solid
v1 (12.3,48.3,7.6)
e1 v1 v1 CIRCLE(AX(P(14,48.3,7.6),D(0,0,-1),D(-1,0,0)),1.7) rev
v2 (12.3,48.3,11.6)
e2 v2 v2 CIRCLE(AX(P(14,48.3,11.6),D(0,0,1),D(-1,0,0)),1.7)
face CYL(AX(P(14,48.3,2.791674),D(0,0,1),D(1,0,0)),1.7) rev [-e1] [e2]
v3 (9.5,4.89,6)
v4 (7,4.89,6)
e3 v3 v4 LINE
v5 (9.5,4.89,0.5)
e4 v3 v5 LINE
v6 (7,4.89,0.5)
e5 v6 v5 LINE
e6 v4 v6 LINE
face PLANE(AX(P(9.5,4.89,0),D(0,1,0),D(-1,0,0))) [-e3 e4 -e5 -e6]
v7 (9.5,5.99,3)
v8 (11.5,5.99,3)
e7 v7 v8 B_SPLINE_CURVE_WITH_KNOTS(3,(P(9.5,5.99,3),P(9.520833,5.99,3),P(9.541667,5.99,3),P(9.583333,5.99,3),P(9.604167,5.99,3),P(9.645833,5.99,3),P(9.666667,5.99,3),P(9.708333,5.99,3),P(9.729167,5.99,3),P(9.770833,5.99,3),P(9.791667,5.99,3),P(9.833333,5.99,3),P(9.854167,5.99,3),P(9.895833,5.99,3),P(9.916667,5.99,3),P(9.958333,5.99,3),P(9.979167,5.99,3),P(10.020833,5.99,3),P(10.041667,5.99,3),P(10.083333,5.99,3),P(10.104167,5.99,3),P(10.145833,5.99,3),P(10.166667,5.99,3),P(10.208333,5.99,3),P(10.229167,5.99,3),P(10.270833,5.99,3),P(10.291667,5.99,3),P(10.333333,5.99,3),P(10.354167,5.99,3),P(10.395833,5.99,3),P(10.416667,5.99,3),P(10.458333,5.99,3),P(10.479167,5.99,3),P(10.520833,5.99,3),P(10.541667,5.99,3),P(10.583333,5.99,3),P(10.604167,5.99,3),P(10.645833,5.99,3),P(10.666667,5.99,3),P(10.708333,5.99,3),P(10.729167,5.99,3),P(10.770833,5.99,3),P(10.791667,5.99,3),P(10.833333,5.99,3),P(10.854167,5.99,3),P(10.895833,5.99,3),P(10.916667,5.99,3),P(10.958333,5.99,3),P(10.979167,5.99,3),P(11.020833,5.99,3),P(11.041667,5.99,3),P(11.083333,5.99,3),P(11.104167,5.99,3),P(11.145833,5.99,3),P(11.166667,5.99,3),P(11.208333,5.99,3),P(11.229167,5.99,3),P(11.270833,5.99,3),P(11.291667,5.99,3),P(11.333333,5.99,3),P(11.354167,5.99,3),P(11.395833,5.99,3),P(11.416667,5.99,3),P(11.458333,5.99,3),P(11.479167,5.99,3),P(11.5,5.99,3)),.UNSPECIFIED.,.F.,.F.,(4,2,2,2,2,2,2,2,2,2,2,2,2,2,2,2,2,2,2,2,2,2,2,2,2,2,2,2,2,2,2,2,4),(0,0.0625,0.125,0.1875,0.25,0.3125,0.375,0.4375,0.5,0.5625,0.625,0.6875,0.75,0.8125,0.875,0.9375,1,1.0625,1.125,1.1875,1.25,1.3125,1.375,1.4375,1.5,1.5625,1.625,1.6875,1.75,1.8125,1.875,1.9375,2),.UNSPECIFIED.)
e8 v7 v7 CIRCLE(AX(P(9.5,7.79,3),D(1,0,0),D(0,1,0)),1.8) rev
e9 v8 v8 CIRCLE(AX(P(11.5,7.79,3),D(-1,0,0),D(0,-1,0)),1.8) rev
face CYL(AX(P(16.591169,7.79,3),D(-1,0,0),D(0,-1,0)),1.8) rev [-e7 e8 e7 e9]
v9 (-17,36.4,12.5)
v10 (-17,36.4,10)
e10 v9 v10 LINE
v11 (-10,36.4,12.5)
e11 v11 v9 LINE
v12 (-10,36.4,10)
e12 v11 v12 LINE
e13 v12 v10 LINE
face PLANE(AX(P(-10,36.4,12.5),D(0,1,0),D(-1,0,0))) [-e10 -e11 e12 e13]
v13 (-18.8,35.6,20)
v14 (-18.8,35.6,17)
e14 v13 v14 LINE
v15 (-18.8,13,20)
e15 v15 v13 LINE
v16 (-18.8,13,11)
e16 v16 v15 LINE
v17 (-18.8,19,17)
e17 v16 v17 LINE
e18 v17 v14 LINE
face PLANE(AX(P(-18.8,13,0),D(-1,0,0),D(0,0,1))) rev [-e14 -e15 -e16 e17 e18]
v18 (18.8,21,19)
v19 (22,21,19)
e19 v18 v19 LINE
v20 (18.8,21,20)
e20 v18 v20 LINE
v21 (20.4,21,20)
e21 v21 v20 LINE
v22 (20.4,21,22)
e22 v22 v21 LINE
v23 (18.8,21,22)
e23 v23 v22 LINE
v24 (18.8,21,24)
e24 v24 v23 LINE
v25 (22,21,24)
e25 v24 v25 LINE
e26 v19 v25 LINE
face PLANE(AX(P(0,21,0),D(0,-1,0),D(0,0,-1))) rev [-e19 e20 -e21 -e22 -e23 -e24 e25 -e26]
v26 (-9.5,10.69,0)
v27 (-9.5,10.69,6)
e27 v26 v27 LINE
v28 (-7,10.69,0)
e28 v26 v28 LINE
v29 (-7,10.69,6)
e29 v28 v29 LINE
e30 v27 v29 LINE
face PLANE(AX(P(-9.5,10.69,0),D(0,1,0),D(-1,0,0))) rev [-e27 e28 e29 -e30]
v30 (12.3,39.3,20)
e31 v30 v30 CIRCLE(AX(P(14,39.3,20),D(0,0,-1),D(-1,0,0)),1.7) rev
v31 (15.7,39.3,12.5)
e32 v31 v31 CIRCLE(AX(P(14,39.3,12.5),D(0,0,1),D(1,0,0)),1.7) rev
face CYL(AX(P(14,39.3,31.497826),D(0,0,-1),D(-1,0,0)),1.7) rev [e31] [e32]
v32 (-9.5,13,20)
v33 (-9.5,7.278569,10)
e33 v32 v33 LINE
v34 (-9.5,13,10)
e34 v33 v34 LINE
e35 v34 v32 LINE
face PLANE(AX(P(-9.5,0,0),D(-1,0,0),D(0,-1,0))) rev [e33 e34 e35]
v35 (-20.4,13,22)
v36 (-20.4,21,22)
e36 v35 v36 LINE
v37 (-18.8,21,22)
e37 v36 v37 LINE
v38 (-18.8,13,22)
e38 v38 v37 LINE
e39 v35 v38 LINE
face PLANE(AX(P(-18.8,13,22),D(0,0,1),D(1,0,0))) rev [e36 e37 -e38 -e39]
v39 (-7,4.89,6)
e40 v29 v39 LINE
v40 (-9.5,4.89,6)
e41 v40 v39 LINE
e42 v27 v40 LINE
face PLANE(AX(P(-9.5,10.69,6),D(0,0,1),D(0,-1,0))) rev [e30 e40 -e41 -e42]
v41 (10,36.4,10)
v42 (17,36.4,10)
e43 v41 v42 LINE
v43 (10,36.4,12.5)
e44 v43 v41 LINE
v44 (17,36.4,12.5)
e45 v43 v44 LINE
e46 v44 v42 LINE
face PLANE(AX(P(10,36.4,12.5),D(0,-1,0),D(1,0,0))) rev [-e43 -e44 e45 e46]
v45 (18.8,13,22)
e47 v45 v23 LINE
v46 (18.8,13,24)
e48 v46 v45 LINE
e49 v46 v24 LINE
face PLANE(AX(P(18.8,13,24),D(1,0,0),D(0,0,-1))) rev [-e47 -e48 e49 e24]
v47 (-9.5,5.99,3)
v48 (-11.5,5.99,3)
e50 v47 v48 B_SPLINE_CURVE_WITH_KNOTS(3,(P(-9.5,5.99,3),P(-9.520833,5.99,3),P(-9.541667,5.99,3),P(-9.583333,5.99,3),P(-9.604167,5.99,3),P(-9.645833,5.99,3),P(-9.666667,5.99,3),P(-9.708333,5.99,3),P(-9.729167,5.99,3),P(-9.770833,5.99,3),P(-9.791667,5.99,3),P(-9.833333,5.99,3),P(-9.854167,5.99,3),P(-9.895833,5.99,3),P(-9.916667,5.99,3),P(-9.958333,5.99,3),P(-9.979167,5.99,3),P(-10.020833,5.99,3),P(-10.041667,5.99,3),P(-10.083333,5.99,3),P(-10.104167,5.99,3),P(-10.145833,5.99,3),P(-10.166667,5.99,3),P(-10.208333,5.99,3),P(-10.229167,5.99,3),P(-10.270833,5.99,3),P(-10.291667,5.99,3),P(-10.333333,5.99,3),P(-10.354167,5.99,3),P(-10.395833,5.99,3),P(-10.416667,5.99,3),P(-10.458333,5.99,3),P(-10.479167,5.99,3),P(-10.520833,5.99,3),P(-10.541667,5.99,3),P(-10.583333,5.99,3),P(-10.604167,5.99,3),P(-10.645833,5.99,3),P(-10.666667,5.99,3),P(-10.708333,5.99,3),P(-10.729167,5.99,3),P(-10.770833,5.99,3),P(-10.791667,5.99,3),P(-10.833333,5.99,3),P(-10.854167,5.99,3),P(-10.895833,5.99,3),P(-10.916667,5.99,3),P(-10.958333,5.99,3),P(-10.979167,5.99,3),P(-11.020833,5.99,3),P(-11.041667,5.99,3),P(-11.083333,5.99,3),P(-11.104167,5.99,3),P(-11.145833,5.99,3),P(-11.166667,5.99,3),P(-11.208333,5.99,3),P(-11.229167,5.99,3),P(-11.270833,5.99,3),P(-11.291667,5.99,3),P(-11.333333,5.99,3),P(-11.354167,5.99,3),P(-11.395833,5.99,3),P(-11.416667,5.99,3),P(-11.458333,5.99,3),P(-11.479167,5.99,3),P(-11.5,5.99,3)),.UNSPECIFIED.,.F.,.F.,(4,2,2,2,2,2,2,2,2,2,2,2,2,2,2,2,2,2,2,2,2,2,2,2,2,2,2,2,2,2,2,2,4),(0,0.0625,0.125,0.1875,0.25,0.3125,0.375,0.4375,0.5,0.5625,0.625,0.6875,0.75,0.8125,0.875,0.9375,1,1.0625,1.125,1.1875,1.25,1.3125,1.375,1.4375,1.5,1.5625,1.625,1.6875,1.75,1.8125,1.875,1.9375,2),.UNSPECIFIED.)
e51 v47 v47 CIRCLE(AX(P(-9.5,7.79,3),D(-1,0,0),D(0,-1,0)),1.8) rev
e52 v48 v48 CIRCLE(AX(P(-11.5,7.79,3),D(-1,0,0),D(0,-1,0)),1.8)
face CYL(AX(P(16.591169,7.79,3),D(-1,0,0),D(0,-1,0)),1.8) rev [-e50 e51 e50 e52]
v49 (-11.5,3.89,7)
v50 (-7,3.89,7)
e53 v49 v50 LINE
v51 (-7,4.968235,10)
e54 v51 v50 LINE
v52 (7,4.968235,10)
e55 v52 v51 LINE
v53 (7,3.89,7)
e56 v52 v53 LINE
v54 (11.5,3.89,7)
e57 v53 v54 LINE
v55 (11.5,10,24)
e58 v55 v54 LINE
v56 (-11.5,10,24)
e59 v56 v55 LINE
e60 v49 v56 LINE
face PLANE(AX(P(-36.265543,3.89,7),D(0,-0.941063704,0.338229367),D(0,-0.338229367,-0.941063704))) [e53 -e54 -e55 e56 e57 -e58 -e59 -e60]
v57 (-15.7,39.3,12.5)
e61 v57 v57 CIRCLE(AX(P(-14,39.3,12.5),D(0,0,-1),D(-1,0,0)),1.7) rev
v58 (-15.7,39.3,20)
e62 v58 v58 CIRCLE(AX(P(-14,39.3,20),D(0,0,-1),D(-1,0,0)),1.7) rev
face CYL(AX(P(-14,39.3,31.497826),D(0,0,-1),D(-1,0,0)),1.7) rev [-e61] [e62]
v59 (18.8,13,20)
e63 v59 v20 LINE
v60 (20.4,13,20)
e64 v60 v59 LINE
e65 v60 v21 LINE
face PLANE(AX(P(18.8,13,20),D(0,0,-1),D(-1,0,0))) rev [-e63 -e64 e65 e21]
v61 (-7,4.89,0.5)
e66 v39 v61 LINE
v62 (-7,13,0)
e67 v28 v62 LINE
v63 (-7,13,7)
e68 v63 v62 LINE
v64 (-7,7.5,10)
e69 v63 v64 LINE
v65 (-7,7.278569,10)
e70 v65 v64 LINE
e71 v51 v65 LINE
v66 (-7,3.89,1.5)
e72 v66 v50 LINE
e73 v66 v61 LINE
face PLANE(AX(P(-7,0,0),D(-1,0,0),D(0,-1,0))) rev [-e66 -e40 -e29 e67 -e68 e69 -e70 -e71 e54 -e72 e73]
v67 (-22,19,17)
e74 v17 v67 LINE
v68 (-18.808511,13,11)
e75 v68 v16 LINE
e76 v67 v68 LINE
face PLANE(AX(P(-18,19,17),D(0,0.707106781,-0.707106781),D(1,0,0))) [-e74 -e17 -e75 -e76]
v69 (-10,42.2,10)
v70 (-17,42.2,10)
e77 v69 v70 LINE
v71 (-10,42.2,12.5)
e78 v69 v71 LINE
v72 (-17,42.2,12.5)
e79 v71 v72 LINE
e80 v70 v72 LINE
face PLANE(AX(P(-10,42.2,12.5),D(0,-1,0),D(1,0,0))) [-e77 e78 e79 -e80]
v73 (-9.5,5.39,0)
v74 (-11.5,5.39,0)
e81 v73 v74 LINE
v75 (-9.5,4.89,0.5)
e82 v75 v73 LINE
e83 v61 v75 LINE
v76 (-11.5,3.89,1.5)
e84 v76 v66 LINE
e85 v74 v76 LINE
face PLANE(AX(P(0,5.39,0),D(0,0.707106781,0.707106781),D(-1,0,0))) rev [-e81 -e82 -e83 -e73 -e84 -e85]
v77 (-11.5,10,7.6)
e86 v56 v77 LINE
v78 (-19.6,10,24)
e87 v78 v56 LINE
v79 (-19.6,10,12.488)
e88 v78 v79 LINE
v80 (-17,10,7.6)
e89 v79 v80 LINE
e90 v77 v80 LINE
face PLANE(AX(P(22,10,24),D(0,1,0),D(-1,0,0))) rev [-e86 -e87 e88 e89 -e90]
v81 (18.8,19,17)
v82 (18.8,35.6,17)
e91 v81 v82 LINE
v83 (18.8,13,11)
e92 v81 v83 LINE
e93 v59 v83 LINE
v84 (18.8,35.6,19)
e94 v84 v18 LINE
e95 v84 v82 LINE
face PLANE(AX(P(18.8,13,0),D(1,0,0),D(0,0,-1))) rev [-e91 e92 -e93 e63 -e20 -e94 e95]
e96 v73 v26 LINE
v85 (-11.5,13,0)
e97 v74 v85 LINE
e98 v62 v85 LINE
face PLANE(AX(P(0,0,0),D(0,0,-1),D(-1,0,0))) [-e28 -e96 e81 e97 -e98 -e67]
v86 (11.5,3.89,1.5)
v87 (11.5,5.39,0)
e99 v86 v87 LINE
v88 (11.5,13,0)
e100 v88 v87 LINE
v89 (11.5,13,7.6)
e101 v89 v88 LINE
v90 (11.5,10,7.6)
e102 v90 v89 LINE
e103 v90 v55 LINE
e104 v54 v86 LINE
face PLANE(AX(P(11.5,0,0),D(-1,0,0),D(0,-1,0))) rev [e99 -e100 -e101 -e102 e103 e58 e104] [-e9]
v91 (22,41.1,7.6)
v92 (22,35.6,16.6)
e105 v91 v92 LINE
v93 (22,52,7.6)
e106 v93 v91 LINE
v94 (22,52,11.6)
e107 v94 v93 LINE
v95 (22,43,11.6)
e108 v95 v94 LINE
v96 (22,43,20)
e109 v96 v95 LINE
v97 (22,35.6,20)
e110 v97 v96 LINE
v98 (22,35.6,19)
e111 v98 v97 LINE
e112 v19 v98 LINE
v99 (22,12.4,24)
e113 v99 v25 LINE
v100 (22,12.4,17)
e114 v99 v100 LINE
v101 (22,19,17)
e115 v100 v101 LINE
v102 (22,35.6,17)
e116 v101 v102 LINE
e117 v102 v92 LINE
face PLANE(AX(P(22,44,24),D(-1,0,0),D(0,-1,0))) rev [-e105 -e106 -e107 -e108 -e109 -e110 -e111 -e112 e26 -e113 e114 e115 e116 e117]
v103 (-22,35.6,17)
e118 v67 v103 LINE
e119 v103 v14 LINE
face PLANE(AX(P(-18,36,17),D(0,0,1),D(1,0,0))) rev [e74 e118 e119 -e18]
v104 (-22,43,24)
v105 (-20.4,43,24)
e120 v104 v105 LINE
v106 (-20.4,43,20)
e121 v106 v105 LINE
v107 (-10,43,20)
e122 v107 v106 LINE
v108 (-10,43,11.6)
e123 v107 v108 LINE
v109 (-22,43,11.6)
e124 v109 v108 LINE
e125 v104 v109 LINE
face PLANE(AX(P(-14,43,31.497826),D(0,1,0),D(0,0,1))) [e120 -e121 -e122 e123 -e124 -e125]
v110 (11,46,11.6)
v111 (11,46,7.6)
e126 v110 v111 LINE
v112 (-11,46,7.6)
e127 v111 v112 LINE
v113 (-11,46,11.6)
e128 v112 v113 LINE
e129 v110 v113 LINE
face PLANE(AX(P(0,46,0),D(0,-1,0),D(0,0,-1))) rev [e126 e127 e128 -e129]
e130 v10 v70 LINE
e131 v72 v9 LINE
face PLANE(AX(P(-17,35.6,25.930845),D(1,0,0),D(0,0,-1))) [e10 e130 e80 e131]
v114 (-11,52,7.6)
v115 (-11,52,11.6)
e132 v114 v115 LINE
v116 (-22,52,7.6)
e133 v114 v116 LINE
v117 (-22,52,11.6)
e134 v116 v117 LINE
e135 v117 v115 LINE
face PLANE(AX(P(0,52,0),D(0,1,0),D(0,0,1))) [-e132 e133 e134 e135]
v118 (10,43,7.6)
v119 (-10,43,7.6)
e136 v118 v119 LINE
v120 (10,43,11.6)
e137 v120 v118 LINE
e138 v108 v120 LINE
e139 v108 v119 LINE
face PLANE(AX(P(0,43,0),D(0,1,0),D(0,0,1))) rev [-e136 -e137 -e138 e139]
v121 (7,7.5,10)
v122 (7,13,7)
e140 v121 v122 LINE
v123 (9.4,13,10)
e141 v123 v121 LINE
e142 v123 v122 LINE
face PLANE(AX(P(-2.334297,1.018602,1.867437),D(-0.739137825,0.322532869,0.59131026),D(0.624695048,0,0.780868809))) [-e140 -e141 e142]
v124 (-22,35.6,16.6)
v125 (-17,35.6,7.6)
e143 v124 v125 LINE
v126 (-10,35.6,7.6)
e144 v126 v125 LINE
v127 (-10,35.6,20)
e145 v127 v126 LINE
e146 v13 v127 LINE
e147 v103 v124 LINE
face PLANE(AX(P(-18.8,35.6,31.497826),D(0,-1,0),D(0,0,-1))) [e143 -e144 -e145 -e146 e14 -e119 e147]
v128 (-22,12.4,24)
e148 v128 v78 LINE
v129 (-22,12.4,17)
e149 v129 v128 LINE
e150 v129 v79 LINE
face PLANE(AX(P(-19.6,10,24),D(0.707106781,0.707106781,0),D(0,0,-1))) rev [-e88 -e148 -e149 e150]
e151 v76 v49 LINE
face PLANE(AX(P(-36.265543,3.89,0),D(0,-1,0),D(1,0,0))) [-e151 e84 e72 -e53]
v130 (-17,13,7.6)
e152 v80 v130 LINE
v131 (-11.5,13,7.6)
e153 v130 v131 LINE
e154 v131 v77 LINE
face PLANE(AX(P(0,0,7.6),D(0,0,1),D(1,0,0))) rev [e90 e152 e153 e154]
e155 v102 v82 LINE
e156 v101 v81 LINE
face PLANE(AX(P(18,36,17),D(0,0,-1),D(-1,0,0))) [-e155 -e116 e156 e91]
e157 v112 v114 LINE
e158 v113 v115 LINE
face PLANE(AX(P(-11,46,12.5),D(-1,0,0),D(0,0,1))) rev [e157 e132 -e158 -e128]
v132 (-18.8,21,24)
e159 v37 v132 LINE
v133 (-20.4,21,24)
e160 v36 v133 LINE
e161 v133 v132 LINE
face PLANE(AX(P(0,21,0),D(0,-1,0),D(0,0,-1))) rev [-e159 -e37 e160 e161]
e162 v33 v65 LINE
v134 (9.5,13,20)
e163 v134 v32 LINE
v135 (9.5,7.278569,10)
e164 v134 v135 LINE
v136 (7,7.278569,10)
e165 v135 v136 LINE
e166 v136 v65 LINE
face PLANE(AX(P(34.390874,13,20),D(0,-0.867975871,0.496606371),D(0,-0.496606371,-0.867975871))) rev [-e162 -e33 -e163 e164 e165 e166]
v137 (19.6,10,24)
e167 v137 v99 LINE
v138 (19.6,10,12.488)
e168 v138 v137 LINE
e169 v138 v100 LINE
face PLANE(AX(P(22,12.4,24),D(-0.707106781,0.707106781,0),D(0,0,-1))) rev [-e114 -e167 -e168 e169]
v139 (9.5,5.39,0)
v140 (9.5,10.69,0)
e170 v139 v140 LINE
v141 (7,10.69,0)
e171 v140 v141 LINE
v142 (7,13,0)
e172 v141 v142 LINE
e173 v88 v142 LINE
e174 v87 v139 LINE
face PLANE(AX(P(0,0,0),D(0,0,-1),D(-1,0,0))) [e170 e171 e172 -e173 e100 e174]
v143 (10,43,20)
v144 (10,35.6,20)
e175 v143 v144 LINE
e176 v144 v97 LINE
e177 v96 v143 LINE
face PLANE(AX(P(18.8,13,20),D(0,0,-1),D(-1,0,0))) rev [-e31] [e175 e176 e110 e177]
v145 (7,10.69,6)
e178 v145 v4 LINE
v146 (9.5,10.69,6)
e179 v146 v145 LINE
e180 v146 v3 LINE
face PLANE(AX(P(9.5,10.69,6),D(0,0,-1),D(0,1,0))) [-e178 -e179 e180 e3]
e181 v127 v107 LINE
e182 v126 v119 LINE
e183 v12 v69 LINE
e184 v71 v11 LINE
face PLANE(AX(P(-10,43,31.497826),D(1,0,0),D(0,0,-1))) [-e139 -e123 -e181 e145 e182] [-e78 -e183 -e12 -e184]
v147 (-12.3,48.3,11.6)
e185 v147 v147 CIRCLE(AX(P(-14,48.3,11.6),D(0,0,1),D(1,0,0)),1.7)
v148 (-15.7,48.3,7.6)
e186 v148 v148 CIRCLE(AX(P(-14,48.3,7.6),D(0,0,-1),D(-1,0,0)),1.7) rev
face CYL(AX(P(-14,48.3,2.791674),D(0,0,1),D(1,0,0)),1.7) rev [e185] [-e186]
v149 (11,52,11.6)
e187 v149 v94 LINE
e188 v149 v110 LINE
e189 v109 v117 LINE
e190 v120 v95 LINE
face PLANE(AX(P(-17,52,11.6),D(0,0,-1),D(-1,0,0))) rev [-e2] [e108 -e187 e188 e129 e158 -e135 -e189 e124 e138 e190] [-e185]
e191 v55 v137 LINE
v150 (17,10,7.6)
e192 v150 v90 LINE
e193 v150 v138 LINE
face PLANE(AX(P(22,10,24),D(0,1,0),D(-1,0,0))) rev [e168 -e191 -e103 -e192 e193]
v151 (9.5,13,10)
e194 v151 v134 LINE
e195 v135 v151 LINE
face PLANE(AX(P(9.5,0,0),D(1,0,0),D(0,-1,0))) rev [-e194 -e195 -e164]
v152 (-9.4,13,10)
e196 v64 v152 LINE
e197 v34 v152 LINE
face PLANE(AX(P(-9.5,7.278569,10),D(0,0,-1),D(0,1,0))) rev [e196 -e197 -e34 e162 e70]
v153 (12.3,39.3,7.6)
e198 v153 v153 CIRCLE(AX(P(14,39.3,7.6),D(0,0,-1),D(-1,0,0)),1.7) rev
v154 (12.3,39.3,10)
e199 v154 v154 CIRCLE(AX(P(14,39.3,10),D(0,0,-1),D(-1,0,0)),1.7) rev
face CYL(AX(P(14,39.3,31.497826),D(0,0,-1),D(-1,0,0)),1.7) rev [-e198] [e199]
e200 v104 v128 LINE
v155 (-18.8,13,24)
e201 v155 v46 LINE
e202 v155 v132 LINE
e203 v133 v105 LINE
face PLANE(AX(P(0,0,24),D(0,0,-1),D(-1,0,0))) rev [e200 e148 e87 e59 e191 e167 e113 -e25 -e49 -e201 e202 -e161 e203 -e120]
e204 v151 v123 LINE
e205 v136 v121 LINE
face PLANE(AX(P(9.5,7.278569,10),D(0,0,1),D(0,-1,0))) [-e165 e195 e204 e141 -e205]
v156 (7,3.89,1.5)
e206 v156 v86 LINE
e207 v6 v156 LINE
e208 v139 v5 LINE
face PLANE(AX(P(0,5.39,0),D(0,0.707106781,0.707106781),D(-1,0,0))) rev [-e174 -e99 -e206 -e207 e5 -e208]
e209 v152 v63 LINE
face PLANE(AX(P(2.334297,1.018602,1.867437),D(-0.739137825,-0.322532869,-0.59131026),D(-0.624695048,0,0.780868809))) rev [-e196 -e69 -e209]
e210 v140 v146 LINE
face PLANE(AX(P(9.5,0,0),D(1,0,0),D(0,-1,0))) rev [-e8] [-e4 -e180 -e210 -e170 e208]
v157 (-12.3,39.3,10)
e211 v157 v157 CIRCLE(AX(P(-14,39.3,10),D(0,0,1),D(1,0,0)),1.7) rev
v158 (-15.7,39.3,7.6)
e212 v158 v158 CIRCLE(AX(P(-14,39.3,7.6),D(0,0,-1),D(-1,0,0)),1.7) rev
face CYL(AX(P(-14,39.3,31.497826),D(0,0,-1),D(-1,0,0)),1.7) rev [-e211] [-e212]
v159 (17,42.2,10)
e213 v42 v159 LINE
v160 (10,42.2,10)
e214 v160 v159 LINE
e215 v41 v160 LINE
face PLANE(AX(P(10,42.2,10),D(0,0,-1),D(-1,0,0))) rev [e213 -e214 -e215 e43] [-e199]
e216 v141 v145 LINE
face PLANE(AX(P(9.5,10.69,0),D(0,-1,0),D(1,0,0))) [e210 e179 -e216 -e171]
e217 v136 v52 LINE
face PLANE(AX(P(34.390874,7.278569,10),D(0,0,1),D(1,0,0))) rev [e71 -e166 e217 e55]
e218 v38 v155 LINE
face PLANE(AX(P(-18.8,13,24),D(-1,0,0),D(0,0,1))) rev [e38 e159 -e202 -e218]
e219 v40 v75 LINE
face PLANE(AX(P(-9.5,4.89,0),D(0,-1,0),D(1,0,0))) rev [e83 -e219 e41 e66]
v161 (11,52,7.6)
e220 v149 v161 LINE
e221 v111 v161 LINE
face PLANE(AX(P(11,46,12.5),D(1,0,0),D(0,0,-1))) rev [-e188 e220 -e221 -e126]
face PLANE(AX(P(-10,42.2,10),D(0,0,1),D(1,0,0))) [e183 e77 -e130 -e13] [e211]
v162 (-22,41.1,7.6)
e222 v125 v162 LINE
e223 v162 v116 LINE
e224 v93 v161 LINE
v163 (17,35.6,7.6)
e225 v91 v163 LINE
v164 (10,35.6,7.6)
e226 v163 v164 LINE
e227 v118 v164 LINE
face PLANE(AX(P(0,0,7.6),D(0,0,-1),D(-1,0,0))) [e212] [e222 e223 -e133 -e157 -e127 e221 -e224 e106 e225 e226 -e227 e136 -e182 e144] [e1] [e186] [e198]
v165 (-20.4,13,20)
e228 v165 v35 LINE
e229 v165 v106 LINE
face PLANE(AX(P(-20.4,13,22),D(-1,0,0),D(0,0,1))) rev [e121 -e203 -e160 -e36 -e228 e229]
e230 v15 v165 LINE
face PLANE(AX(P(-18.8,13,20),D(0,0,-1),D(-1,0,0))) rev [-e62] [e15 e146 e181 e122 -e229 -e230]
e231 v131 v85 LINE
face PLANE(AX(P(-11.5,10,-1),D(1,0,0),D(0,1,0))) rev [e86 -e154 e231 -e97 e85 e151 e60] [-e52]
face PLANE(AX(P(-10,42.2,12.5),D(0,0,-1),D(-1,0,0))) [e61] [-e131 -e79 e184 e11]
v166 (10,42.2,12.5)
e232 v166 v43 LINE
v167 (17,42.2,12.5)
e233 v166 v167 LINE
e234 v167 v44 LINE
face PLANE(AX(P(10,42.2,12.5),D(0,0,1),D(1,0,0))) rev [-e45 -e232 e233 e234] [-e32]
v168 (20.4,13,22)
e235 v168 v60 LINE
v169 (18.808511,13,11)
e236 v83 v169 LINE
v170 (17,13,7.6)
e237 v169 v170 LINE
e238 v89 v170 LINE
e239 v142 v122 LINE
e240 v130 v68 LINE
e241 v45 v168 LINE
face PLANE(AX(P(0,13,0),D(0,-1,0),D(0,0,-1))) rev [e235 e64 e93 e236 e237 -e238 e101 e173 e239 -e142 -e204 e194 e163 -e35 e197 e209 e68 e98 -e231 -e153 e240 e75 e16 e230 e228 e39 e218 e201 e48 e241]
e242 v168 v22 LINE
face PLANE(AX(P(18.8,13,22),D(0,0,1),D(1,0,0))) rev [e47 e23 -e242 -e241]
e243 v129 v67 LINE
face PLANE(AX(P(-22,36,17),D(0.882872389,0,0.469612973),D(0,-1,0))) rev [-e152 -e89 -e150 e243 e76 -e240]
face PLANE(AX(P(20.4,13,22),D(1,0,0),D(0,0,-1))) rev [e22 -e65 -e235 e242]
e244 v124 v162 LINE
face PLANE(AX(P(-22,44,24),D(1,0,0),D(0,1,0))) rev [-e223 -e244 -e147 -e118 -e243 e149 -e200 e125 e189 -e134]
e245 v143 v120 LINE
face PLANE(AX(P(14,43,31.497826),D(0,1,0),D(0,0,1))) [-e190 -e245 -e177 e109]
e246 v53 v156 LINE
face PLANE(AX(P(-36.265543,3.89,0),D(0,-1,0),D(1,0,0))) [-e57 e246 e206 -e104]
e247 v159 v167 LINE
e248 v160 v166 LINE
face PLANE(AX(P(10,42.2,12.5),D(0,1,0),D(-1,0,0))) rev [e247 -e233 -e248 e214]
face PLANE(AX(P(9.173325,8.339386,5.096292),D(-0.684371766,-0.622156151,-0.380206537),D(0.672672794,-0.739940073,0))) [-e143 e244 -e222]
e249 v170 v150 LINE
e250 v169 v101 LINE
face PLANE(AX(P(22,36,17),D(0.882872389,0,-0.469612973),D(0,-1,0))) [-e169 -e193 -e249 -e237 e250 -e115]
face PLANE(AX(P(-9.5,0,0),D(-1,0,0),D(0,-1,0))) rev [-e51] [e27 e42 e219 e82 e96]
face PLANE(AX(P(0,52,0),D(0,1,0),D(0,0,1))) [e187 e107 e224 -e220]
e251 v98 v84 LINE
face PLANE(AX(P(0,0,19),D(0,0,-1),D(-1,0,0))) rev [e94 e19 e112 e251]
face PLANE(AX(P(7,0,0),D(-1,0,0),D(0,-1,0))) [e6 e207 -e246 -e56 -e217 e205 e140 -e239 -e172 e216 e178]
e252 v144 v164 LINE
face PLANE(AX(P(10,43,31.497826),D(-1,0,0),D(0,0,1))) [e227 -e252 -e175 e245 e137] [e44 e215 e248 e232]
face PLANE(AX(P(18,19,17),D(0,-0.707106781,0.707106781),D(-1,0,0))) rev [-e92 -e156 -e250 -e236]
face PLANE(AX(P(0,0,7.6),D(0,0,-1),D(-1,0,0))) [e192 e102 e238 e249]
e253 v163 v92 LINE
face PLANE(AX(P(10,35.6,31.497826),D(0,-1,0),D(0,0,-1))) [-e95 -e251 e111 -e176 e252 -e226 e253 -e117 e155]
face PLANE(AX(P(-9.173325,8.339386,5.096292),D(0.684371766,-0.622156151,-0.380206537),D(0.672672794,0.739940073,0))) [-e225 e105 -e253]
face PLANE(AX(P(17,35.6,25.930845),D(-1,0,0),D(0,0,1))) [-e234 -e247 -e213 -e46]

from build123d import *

# Parameters (mm, degrees)
SKETCH_1_W                = 44
SKETCH_1_H                = 34
EXTRUDE_1_DEPTH           = 24
CUT_EXTRUDE_1_DEPTH       = 31
SKETCH_5_W                = 23
SKETCH_5_H                = 6.11
EXTRUDE_4_DEPTH           = 1
EXTRUDE_5_DEPTH           = 23
SKETCH_7_R                = 1.8
CUT_EXTRUDE_2_DEPTH       = 23
CUT_EXTRUDE_4_DEPTH       = 14
SKETCH_11_R               = 1.7
EXTRUDE_6_DEPTH           = 20
CUT_EXTRUDE_7_DEPTH       = 4
CHAMFER_3_SIZE            = 2.4
SKETCH_14_W               = 40.8
SKETCH_14_H               = 4
CUT_EXTRUDE_8_DEPTH       = 23
SKETCH_15_W               = 44
SKETCH_15_H               = 1
CUT_EXTRUDE_9_DEPTH       = 24
SKETCH_16_W               = 3.2
SKETCH_16_H               = 14.6
CUT_EXTRUDE_10_DEPTH      = 5
CUT_EXTRUDE_12_DEPTH      = 10
CUT_EXTRUDE_12_DEPTH_BACK = 17
SKETCH_19_W               = 1
SKETCH_19_H               = 6.11
CUT_EXTRUDE_13_DEPTH      = 23
CHAMFER_4_SIZE            = 1.5
SKETCH_22_W               = 34
SKETCH_22_H               = 7.4
SKETCH_22_W_2             = 5.5
SKETCH_22_H_2             = 3
CUT_EXTRUDE_14_DEPTH      = 7.6
SKETCH_23_W               = 6
SKETCH_23_H               = 5.8
CUT_EXTRUDE_15_DEPTH      = 2.5
SKETCH_25_W               = 2.5
SKETCH_25_H               = 5.8
CUT_EXTRUDE_17_DEPTH      = 7
SKETCH_26_W               = 34
SKETCH_26_H               = 4
EXTRUDE_7_DEPTH           = 9
SKETCH_27_W               = 22
SKETCH_27_H               = 4.9
CUT_EXTRUDE_18_DEPTH      = 6
SKETCH_28_R               = 1.7
CUT_EXTRUDE_19_DEPTH      = 4
CHAMFER_5_SIZE            = 5
CHAMFER_5_SIZE_2          = 9.4
CHAMFER_6_SIZE            = 5
CHAMFER_6_SIZE_2          = 9.4
SKETCH_30_W               = 5
SKETCH_30_H               = 7.4
EXTRUDE_8_DEPTH           = 9.4
SKETCH_32_W               = 5
SKETCH_32_H               = 4
EXTRUDE_9_DEPTH           = 9
SKETCH_33_W               = 1.6
SKETCH_33_H               = 4
CUT_EXTRUDE_20_DEPTH      = 7.4
CHAMFER_START             = 3.158134344
CHAMFER_7_DEPTH           = 2.841865656
CHAMFER_START_2           = -6
CHAMFER_8_DEPTH           = 2.841865656
CHAMFER_START_3           = 9
CHAMFER_9_DEPTH           = 4.404008624
CHAMFER_START_4           = -13.404008624
CHAMFER_10_DEPTH          = 14.281940081
CHAMFER_11_SIZE           = 6
CHAMFER_12_SIZE           = 6


with BuildPart() as part:
    # Эскиз1 → Бобышка-Вытянуть1 (new body)
    with BuildSketch(Plane.XY):
        with Locations((0, 27)):
            Rectangle(SKETCH_1_W, SKETCH_1_H)
    extrude(amount=EXTRUDE_1_DEPTH)

    # Эскиз2 → Вырез-Вытянуть1 (cut)
    with BuildSketch(Plane(origin=(0, 44, 0), x_dir=(1, 0, 0), z_dir=(0, 1, 0))):
        Polygon((-18.8, 0), (18.8, 0), (18.8, -20), (20.4, -20), (20.4, -22), (18.8, -22), (18.8, -24), (-18.8, -24), (-18.8, -22), (-20.4, -22), (-20.4, -20), (-18.8, -20), align=None)
    extrude(amount=-CUT_EXTRUDE_1_DEPTH, mode=Mode.SUBTRACT)



with BuildPart() as body_2:
    # Эскиз5 → Бобышка-Вытянуть4 (new body)
    with BuildSketch(Plane(origin=(0, 0, 0), x_dir=(-1, 0, 0), z_dir=(0, 0, -1))):
        with Locations((0, 6.945)):
            Rectangle(SKETCH_5_W, SKETCH_5_H)
    extrude(amount=EXTRUDE_4_DEPTH)


with BuildPart() as part_1:
    add(part.part)

    add(body_2.part)  # Бобышка-Вытянуть5 merges body 2
    # Эскиз6 → Бобышка-Вытянуть5 (add)
    with BuildSketch(Plane(origin=(11.5, 0, 0), x_dir=(0, 0, -1), z_dir=(1, 0, 0))):
        Polygon((0, 3.89), (-7, 3.89), (-24, 10), (0, 10), align=None)
    extrude(amount=-EXTRUDE_5_DEPTH)

    # Эскиз7 → Вырез-Вытянуть2 (cut)
    with BuildSketch(Plane.ZY.offset(11.5)):
        with Locations(Location((3, 7.79, 0), (0, 0, 270))):
            Circle(SKETCH_7_R)
    extrude(amount=-CUT_EXTRUDE_2_DEPTH, mode=Mode.SUBTRACT)

    # Эскиз8 → Вырез-Вытянуть4 (cut)
    with BuildSketch(Plane.ZY.offset(7)):
        Polygon((20, 13), (-1, 13), (-1, 3.89), (10, 3.89), (10, 7.278569391), align=None)
    extrude(amount=-CUT_EXTRUDE_4_DEPTH, mode=Mode.SUBTRACT)

    # Эскиз11 → Бобышка-Вытянуть6 (add)
    # profile 1 of 2: a face of its own
    with BuildSketch(Plane(origin=(0, 0, 0), x_dir=(-1, 0, 0), z_dir=(0, 0, -1))):
        Polygon((-14, 43), (-18.8, 43), (-18.8, 35.6), (-14, 35.6), (-10, 35.6), (-10, 43), align=None)
        with Locations((-14, 39.3)):
            Circle(SKETCH_11_R, mode=Mode.SUBTRACT)
    # profile 2 of 2: a face of its own
    with BuildSketch(Plane(origin=(0, 0, 0), x_dir=(-1, 0, 0), z_dir=(0, 0, -1))):
        Polygon((18.8, 35.6), (14, 35.6), (10, 35.6), (10, 43), (14, 43), (18.8, 43), align=None)
        with Locations((14, 39.3)):
            Circle(SKETCH_11_R, mode=Mode.SUBTRACT)
    extrude(amount=-EXTRUDE_6_DEPTH)

    # Эскиз13 → Вырез-Вытянуть7 (cut)
    with BuildSketch(Plane.ZY.offset(22)):
        Polygon((9, 34), (17, 36), (17, 33.5), (9, 31.5), align=None)
        Polygon((9, 30.5), (17, 32.5), (17, 30), (9, 28), align=None)
        Polygon((9, 27), (17, 29), (17, 26.5), (9, 24.5), align=None)
        Polygon((9, 23.5), (17, 25.5), (17, 23), (9, 21), align=None)
        Polygon((9, 20), (17, 22), (17, 19.5), (9, 17.5), align=None)
    cut_extrude_7 = extrude(amount=-CUT_EXTRUDE_7_DEPTH, mode=Mode.SUBTRACT)

    # Зеркальное отражение1: Вырез-Вытянуть7 across plane
    add(cut_extrude_7.mirror(Plane(origin=(0, 0, 0), x_dir=(0, 0, 1), z_dir=(1, 0, 0))), mode=Mode.SUBTRACT)

    # Фаска3
    chamfer_3_edges = [part_1.edges().sort_by_distance(p)[0] for p in [
        (22, 10, 12),
        (-22, 10, 12),
    ]]
    chamfer(chamfer_3_edges, length=CHAMFER_3_SIZE)

    # Эскиз14 → Вырез-Вытянуть8 (cut)
    with BuildSketch(Plane(origin=(0, 44, 0), x_dir=(1, 0, 0), z_dir=(0, 1, 0))):
        with Locations((0, -22)):
            Rectangle(SKETCH_14_W, SKETCH_14_H)
    extrude(amount=-CUT_EXTRUDE_8_DEPTH, mode=Mode.SUBTRACT)

    # Эскиз15 → Вырез-Вытянуть9 (cut)
    with BuildSketch(Plane(origin=(0, 0, 0), x_dir=(-1, 0, 0), z_dir=(0, 0, -1))):
        with Locations((0, 43.5)):
            Rectangle(SKETCH_15_W, SKETCH_15_H)
    extrude(amount=-CUT_EXTRUDE_9_DEPTH, mode=Mode.SUBTRACT)

    # Эскиз16 → Вырез-Вытянуть10 (cut)
    with BuildSketch(Plane.XY.offset(24)):
        with Locations((20.4, 28.3)):
            Rectangle(SKETCH_16_W, SKETCH_16_H)
    extrude(amount=-CUT_EXTRUDE_10_DEPTH, mode=Mode.SUBTRACT)

    # Эскиз18 → Вырез-Вытянуть12 (cut, two sides: drawn at the far end of the back side and taken through both)
    with BuildSketch(Plane(origin=(0, 0, 0), x_dir=(-1, 0, 0), z_dir=(0, 0, -1)).offset(-CUT_EXTRUDE_12_DEPTH_BACK)):
        Polygon((-22, 43), (-17, 43), (-17, 10), (-19.6, 10), (-22, 12.4), align=None)
        Polygon((22, 12.4), (19.6, 10), (17, 10), (17, 43), (22, 43), align=None)
    extrude(amount=CUT_EXTRUDE_12_DEPTH + CUT_EXTRUDE_12_DEPTH_BACK, mode=Mode.SUBTRACT)

    # Эскиз19 → Вырез-Вытянуть13 (cut)
    with BuildSketch(Plane.ZY.offset(11.5)):
        with Locations((-0.5, 6.945)):
            Rectangle(SKETCH_19_W, SKETCH_19_H)
    extrude(amount=-CUT_EXTRUDE_13_DEPTH, mode=Mode.SUBTRACT)

    # Фаска4
    chamfer_4_edges = [part_1.edges().sort_by_distance(p)[0] for p in [
        (-9.25, 3.89, 0),
        (9.25, 3.89, 0),
    ]]
    chamfer(chamfer_4_edges, length=CHAMFER_4_SIZE)

    # Эскиз22 → Вырез-Вытянуть14 (cut)
    with BuildSketch(Plane(origin=(0, 0, 0), x_dir=(-1, 0, 0), z_dir=(0, 0, -1))):
        with Locations((0, 39.3)):
            Rectangle(SKETCH_22_W, SKETCH_22_H)
        with Locations((-14.25, 11.5)):
            Rectangle(SKETCH_22_W_2, SKETCH_22_H_2)
        with Locations((14.25, 11.5)):
            Rectangle(SKETCH_22_W_2, SKETCH_22_H_2)
    extrude(amount=-CUT_EXTRUDE_14_DEPTH, mode=Mode.SUBTRACT)

    # Эскиз23 → Вырез-Вытянуть15 (cut)
    with BuildSketch(Plane(origin=(-7, 0, 0), x_dir=(0, 0, -1), z_dir=(1, 0, 0))):
        with Locations((-3, 7.79)):
            Rectangle(SKETCH_23_W, SKETCH_23_H)
        Polygon((-20, 13), (-10, 7.278569391), (-10, 13), align=None)
    cut_extrude_15 = extrude(amount=-CUT_EXTRUDE_15_DEPTH, mode=Mode.SUBTRACT)

    # Зеркальное отражение2: Вырез-Вытянуть15 across plane
    add(cut_extrude_15.mirror(Plane(origin=(0, 0, 0), x_dir=(0, 0, 1), z_dir=(1, 0, 0))), mode=Mode.SUBTRACT)

    # Эскиз25 → Вырез-Вытянуть17 (cut)
    with BuildSketch(Plane(origin=(17, 0, 0), x_dir=(0, 0, -1), z_dir=(1, 0, 0))):
        with Locations((-11.25, 39.3)):
            Rectangle(SKETCH_25_W, SKETCH_25_H)
    cut_extrude_17 = extrude(amount=-CUT_EXTRUDE_17_DEPTH, mode=Mode.SUBTRACT)

    # Зеркальное отражение3: Вырез-Вытянуть17 across plane
    add(cut_extrude_17.mirror(Plane(origin=(0, 0, 0), x_dir=(0, 0, 1), z_dir=(1, 0, 0))), mode=Mode.SUBTRACT)

    # Эскиз26 → Бобышка-Вытянуть7 (add)
    with BuildSketch(Plane(origin=(0, 43, 0), x_dir=(1, 0, 0), z_dir=(0, 1, 0))):
        with Locations((0, -9.6)):
            Rectangle(SKETCH_26_W, SKETCH_26_H)
    extrude(amount=EXTRUDE_7_DEPTH)

    # Эскиз27 → Вырез-Вытянуть18 (cut)
    with BuildSketch(Plane(origin=(0, 52, 0), x_dir=(1, 0, 0), z_dir=(0, 1, 0))):
        with Locations((0, -10.05)):
            Rectangle(SKETCH_27_W, SKETCH_27_H)
    extrude(amount=-CUT_EXTRUDE_18_DEPTH, mode=Mode.SUBTRACT)

    # Эскиз28 → Вырез-Вытянуть19 (cut)
    with BuildSketch(Plane.XY.offset(11.6)):
        with Locations((-14, 48.3)):
            Circle(SKETCH_28_R)
        with Locations(Location((14, 48.3, 0), (0, 0, 180))):
            Circle(SKETCH_28_R)
    extrude(amount=-CUT_EXTRUDE_19_DEPTH, mode=Mode.SUBTRACT)

    # Фаска5
    # the kernel refuses this chamfer: 9.4, 5 mm, written as the material it adds along each edge
    with BuildSketch(Plane(origin=(-17, 10, 17), x_dir=(-1, 0, 0), z_dir=(0, 1, 0))) as chamfer_5_piece_1_section:
        Polygon((CHAMFER_5_SIZE, 0), (0, -CHAMFER_5_SIZE_2), (0, 0), align=None)
    chamfer_5_piece_1 = extrude(amount=3, mode=Mode.PRIVATE)
    chamfer_5_piece_1 = split(chamfer_5_piece_1, bisect_by=Plane(origin=(-18.3, 8.7, 17), z_dir=(0.7071067811865478, 0.7071067811865474, 0)), keep=Keep.TOP, mode=Mode.PRIVATE)
    add(chamfer_5_piece_1)

    # Фаска6
    # the kernel refuses this chamfer: 9.4, 5 mm, written as the material it adds along each edge
    with BuildSketch(Plane(origin=(17, 13, 17), x_dir=(1, 0, 0), z_dir=(0, -1, 0))) as chamfer_6_piece_1_section:
        Polygon((CHAMFER_6_SIZE, 0), (0, -CHAMFER_6_SIZE_2), (0, 0), align=None)
    chamfer_6_piece_1 = extrude(amount=3, mode=Mode.PRIVATE)
    chamfer_6_piece_1 = split(chamfer_6_piece_1, bisect_by=Plane(origin=(19.8, 10.2, 17), z_dir=(-0.7071067811865478, 0.7071067811865474, 0)), keep=Keep.TOP, mode=Mode.PRIVATE)
    add(chamfer_6_piece_1)

    # Эскиз30 → Бобышка-Вытянуть8 (add)
    with BuildSketch(Plane(origin=(0, 0, 7.6), x_dir=(-1, 0, 0), z_dir=(0, 0, -1))):
        with Locations((-19.5, 39.3)):
            Rectangle(SKETCH_30_W, SKETCH_30_H)
        with Locations((19.5, 39.3)):
            Rectangle(SKETCH_30_W, SKETCH_30_H)
    extrude(amount=-EXTRUDE_8_DEPTH)

    # Эскиз32 → Бобышка-Вытянуть9 (add)
    with BuildSketch(Plane(origin=(0, 52, 0), x_dir=(1, 0, 0), z_dir=(0, 1, 0))):
        with Locations((-19.5, -9.6)):
            Rectangle(SKETCH_32_W, SKETCH_32_H)
        with Locations((19.5, -9.6)):
            Rectangle(SKETCH_32_W, SKETCH_32_H)
    extrude(amount=-EXTRUDE_9_DEPTH)

    # Эскиз33 → Вырез-Вытянуть20 (cut)
    with BuildSketch(Plane(origin=(0, 43, 0), x_dir=(1, 0, 0), z_dir=(0, 1, 0))):
        with Locations((21.2, -22)):
            Rectangle(SKETCH_33_W, SKETCH_33_H)
    extrude(amount=-CUT_EXTRUDE_20_DEPTH, mode=Mode.SUBTRACT)

    # Фаска7: read off the stored shape, not the designer's step
    # Фаска7 outline → Фаска7 (cut)
    with BuildSketch(Plane(origin=(0, 0, 0), x_dir=(0.6735542111960274, -0.35393772244377236, -0.648885824480249), z_dir=(0.7391378251585405, 0.3225328691600908, 0.5913102601268327)).offset(CHAMFER_START)):
        Polygon((-13.858270642, 1.79569549), (-13.858270642, 8.060677533), (-17.421458222, 6.624121141), align=None)
    extrude(amount=CHAMFER_7_DEPTH, mode=Mode.SUBTRACT)

    # Фаска8: read off the stored shape, not the designer's step
    # Фаска8 outline → Фаска8 (cut)
    with BuildSketch(Plane(origin=(0, 0, 0), x_dir=(0.6735542111960274, 0.35393772244377236, 0.648885824480249), z_dir=(0.7391378251585405, -0.3225328691600908, -0.5913102601268327)).offset(CHAMFER_START_2)):
        Polygon((17.421458222, -6.624121141), (13.858270642, -1.79569549), (13.858270642, -8.060677533), align=None)
    extrude(amount=CHAMFER_8_DEPTH, mode=Mode.SUBTRACT)

    # Фаска9: read off the stored shape, not the designer's step
    # Фаска9 outline → Фаска9 (cut)
    with BuildSketch(Plane(origin=(0, 0, 0), x_dir=(0.7291332431365165, -0.583961995177201, -0.35686566371940037), z_dir=(0.6843717657481387, 0.6221561506801269, 0.3802065365267439)).offset(CHAMFER_START_3)):
        Polygon((-42.753948395, 4.399141898), (-35.896491206, 12.078678401), (-42.753948395, 14.946653453), align=None)
    extrude(amount=CHAMFER_9_DEPTH, mode=Mode.SUBTRACT)

    # Фаска10: read off the stored shape, not the designer's step
    # Фаска10 outline → Фаска10 (cut)
    with BuildSketch(Plane(origin=(0, 0, 0), x_dir=(0.7291332431365165, 0.583961995177201, 0.35686566371940037), z_dir=(0.6843717657481387, -0.6221561506801269, -0.3802065365267439)).offset(CHAMFER_START_4)):
        Polygon((42.753948395, -4.399141898), (35.896491206, -12.078678401), (42.753948395, -14.946653453), align=None)
    extrude(amount=CHAMFER_10_DEPTH, mode=Mode.SUBTRACT)

    # Фаска11
    chamfer_11_edges = [part_1.edges().sort_by_distance(p)[0] for p in [
        (-20.4, 13, 17),
    ]]
    chamfer(chamfer_11_edges, length=CHAMFER_11_SIZE)

    # Фаска12
    chamfer_12_edges = [part_1.edges().sort_by_distance(p)[0] for p in [
        (20.4, 13, 17),
    ]]
    chamfer(chamfer_12_edges, length=CHAMFER_12_SIZE)


solid = part_1.part
